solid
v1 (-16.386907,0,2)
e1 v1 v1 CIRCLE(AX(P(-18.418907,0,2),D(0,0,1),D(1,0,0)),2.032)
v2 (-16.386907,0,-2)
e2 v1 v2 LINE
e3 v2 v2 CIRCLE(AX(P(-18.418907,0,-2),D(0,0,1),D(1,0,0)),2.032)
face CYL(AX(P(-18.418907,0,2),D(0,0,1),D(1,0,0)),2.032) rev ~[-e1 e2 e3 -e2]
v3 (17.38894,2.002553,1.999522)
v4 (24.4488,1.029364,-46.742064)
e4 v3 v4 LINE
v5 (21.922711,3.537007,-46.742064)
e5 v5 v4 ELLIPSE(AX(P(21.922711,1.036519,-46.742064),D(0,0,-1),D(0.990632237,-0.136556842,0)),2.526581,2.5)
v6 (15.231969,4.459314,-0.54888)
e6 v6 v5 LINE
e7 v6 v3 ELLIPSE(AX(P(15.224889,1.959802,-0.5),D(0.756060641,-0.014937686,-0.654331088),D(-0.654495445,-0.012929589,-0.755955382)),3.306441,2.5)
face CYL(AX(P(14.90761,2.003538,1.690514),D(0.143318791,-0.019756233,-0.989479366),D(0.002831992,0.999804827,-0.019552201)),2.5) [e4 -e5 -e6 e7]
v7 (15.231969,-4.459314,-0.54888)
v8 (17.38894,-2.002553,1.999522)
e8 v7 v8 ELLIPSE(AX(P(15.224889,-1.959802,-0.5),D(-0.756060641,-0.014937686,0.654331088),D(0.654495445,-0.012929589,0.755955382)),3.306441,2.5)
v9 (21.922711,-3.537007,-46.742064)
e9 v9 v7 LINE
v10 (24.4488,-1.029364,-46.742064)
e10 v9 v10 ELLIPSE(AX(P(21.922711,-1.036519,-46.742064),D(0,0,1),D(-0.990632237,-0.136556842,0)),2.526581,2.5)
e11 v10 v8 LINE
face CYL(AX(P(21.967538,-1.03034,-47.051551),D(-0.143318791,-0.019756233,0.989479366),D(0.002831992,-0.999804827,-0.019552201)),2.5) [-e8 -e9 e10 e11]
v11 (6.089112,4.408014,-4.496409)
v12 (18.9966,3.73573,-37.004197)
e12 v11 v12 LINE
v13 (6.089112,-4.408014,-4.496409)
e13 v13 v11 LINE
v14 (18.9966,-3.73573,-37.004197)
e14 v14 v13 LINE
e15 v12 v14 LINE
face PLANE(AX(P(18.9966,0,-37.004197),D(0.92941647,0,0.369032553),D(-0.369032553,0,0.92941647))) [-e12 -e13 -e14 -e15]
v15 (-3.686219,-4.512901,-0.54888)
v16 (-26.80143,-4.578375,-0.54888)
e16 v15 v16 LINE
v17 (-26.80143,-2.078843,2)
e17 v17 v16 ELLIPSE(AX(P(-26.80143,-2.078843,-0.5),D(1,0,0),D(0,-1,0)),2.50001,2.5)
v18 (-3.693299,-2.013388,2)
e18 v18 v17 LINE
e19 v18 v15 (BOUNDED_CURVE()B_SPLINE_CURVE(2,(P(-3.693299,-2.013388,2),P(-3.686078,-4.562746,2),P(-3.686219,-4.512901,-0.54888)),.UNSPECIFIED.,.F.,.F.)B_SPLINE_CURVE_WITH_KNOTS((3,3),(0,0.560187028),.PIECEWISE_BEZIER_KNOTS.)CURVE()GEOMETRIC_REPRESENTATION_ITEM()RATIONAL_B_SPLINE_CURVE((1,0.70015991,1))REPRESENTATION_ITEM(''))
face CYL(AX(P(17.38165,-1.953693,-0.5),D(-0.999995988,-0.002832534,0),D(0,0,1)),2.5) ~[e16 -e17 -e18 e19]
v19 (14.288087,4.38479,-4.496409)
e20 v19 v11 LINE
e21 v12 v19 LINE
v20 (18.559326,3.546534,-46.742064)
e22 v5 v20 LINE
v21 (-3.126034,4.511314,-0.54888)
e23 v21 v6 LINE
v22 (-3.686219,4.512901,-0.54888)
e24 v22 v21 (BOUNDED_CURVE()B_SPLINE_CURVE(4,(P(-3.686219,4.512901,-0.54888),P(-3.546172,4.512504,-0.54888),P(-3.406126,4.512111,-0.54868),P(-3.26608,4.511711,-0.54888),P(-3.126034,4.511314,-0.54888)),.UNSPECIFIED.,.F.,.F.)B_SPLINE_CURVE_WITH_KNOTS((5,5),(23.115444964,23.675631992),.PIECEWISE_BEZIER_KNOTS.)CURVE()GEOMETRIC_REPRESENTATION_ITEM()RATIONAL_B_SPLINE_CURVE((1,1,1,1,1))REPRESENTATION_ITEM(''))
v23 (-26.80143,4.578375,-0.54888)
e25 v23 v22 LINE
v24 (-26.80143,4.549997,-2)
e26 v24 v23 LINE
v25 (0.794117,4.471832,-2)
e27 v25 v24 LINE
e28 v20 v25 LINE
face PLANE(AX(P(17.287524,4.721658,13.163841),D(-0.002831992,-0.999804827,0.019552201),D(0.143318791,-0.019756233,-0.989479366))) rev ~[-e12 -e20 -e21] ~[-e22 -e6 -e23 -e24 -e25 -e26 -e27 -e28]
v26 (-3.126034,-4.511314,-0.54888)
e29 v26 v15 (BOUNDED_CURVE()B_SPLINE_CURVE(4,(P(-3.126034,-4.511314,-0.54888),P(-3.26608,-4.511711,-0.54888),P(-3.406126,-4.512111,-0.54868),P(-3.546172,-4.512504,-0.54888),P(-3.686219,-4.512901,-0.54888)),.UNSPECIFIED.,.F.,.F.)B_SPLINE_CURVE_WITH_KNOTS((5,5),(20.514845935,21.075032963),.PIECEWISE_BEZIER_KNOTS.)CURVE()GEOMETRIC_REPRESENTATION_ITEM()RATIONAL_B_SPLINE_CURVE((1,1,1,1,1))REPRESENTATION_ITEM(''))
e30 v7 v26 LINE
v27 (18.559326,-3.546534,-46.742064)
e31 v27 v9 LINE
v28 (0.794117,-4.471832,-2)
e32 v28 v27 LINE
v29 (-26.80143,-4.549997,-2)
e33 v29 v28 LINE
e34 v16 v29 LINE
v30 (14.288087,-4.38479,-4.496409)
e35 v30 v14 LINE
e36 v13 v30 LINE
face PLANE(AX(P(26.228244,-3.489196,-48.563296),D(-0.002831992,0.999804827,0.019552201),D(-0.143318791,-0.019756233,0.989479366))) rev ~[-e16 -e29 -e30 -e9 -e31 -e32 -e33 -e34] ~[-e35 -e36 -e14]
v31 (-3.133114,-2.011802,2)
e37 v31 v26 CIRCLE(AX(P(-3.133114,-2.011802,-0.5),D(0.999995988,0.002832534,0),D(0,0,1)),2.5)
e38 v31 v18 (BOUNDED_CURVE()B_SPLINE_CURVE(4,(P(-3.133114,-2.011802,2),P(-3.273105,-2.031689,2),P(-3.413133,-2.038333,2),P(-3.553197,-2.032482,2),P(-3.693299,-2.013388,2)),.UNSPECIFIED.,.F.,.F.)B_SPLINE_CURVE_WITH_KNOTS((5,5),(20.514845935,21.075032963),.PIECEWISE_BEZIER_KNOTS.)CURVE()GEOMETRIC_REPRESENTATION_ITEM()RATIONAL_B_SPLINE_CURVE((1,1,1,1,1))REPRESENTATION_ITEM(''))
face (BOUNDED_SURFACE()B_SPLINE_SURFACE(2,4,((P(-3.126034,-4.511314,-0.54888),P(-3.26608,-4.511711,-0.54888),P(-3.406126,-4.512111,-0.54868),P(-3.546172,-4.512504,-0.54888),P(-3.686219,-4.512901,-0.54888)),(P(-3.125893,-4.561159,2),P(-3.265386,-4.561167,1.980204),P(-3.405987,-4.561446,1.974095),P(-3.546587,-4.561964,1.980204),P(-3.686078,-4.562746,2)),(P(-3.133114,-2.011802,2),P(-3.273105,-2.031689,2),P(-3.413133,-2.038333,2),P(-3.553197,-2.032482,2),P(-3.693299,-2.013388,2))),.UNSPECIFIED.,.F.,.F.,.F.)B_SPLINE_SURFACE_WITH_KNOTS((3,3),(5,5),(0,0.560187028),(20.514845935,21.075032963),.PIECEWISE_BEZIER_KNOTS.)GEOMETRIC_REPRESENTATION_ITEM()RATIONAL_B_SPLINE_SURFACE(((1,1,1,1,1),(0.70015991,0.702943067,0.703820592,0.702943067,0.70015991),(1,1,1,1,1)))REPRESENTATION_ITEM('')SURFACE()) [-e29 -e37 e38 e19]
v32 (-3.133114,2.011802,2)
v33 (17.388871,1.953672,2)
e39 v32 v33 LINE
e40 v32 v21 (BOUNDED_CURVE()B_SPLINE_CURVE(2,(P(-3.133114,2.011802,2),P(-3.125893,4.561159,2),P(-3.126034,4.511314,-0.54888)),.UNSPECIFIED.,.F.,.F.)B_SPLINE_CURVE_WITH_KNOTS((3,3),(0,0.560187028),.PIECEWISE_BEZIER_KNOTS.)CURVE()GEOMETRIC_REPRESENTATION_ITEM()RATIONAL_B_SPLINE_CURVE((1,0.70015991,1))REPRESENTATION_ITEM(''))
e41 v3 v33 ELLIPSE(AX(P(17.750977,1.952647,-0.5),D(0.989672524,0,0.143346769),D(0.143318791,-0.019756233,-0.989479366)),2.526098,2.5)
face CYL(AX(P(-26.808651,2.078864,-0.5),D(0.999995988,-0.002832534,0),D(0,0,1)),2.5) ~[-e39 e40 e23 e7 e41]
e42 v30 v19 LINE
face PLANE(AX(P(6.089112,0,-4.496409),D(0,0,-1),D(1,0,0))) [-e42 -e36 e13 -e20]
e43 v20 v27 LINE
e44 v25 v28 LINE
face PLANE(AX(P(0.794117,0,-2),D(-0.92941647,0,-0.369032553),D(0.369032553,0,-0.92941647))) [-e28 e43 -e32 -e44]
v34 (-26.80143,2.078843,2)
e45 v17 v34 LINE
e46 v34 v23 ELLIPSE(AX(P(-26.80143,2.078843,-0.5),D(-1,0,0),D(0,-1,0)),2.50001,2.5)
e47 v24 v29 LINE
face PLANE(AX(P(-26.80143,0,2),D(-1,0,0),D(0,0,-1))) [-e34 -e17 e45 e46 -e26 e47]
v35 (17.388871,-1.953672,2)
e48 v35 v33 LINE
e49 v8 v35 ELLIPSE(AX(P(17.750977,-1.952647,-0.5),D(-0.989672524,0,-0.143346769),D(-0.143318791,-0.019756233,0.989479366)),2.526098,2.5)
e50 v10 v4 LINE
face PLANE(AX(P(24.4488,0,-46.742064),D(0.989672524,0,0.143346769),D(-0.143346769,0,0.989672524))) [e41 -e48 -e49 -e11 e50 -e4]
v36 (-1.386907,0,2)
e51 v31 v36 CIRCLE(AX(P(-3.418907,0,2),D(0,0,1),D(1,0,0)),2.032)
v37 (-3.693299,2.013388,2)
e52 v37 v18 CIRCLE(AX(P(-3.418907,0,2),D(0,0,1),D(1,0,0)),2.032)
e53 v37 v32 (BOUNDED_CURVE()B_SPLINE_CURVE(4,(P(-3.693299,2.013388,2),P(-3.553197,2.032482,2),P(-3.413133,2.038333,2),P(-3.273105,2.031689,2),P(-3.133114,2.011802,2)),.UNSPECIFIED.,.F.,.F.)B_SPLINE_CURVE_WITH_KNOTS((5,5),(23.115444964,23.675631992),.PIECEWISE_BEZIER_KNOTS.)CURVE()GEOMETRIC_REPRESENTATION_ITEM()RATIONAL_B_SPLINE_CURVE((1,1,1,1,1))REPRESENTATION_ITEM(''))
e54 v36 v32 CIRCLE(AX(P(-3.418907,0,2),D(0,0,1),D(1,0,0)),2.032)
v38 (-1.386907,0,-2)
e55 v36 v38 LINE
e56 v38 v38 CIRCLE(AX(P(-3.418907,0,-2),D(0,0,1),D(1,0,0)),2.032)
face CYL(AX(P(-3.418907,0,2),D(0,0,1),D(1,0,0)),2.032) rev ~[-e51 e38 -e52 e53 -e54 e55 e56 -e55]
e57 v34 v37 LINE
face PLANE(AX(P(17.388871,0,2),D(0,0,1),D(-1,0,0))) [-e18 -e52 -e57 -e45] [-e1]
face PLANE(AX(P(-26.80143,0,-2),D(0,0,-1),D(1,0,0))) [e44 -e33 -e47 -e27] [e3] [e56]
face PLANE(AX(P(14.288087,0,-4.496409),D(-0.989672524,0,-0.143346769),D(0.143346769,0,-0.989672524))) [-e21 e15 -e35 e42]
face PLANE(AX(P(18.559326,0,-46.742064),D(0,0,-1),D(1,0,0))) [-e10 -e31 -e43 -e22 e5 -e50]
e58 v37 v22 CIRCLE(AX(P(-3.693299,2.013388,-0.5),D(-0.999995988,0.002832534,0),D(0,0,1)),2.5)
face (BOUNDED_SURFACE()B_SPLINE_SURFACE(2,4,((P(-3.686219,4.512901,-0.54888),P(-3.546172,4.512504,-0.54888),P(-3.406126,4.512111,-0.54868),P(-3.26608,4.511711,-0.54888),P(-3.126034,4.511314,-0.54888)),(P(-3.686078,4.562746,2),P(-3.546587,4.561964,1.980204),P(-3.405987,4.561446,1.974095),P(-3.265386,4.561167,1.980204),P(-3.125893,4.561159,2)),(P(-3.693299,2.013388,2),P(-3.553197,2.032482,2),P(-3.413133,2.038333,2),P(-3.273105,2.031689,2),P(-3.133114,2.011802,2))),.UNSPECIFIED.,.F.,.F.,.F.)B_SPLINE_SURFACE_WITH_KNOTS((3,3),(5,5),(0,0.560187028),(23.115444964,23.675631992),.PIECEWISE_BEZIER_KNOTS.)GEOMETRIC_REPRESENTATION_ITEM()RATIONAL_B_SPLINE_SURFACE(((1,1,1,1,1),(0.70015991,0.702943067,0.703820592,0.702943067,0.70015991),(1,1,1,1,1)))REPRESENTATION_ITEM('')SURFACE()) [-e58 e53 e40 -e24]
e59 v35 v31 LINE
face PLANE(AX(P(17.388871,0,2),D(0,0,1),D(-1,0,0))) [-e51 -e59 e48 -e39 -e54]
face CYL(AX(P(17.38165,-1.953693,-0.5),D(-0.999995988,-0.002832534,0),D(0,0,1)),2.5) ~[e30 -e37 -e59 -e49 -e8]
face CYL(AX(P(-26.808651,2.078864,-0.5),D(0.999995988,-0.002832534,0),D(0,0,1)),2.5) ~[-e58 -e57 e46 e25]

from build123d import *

# Parameters (mm, degrees)
F1_DEPTH      = 11.5
F1_DEPTH_BACK = 7.25
F4_DEPTH      = 57.75
F5_R          = 2.032
F6_DEPTH      = 25
F7_R          = 2.5


# Not quite as in the source:
# - a feature names something its author has since deleted; it is built from what else it names


with BuildPart() as f1:
    # F0 (on Front) → F1 (new body, two sides)
    with BuildSketch(Plane.XZ) as f1_sk:
        Polygon((-26.8014297359, 2.0000000475), (-26.8014297359, -2.0000000475), (0.7941166829, -2.0000000475), (18.5593261492, -46.7420644607), (24.4487996128, -46.7420644607), (17.3888709152, 2.0000000475), align=None)
        Polygon((18.9966002603, -37.0041966029), (6.0891124744, -4.4964093445), (14.2880869367, -4.4964093445), align=None, mode=Mode.SUBTRACT)
    extrude(amount=F1_DEPTH)
    extrude(f1_sk.sketch, amount=-F1_DEPTH_BACK)

    # F3 (on offset) → F4 (cut)
    with BuildSketch(Plane(origin=(18.7998007554, 0, 2.7230125396), x_dir=(0, 1, 0), z_dir=(0.9896725236, 0, 0.1433467688))):
        Polygon((-18.5980091819, 10.2755831857), (-17.1822748397, -51.6943840463), (-3.4891957167, -51.8214939905), (-4.7216577223, 10.5497811385), align=None)
        Polygon((3.4891957167, -51.8214939905), (17.1822748397, -51.6943840463), (18.5980091819, 10.2755831857), (4.7216577223, 10.5497811385), align=None)
    extrude(amount=-F4_DEPTH, mode=Mode.SUBTRACT)

    # F5 (on face) → F6 (cut)
    with BuildSketch(Plane.XY.offset(2.0000000475)):
        with Locations((-3.4189070485, 0)):
            Circle(F5_R)
        with Locations((-18.4189070485, 0)):
            Circle(F5_R)
    extrude(amount=-F6_DEPTH, mode=Mode.SUBTRACT)

    # F7
    f7_edges = [f1.edges().sort_by_distance(p)[0] for p in [
        (-4.706279, -4.565636, 2),
        (-4.706279, 4.565636, 2),
        (20.918835, 4.016451, -22.371032),
        (20.918835, -4.016451, -22.371032),
    ]]
    fillet(f7_edges, radius=F7_R)


solid = f1.part
